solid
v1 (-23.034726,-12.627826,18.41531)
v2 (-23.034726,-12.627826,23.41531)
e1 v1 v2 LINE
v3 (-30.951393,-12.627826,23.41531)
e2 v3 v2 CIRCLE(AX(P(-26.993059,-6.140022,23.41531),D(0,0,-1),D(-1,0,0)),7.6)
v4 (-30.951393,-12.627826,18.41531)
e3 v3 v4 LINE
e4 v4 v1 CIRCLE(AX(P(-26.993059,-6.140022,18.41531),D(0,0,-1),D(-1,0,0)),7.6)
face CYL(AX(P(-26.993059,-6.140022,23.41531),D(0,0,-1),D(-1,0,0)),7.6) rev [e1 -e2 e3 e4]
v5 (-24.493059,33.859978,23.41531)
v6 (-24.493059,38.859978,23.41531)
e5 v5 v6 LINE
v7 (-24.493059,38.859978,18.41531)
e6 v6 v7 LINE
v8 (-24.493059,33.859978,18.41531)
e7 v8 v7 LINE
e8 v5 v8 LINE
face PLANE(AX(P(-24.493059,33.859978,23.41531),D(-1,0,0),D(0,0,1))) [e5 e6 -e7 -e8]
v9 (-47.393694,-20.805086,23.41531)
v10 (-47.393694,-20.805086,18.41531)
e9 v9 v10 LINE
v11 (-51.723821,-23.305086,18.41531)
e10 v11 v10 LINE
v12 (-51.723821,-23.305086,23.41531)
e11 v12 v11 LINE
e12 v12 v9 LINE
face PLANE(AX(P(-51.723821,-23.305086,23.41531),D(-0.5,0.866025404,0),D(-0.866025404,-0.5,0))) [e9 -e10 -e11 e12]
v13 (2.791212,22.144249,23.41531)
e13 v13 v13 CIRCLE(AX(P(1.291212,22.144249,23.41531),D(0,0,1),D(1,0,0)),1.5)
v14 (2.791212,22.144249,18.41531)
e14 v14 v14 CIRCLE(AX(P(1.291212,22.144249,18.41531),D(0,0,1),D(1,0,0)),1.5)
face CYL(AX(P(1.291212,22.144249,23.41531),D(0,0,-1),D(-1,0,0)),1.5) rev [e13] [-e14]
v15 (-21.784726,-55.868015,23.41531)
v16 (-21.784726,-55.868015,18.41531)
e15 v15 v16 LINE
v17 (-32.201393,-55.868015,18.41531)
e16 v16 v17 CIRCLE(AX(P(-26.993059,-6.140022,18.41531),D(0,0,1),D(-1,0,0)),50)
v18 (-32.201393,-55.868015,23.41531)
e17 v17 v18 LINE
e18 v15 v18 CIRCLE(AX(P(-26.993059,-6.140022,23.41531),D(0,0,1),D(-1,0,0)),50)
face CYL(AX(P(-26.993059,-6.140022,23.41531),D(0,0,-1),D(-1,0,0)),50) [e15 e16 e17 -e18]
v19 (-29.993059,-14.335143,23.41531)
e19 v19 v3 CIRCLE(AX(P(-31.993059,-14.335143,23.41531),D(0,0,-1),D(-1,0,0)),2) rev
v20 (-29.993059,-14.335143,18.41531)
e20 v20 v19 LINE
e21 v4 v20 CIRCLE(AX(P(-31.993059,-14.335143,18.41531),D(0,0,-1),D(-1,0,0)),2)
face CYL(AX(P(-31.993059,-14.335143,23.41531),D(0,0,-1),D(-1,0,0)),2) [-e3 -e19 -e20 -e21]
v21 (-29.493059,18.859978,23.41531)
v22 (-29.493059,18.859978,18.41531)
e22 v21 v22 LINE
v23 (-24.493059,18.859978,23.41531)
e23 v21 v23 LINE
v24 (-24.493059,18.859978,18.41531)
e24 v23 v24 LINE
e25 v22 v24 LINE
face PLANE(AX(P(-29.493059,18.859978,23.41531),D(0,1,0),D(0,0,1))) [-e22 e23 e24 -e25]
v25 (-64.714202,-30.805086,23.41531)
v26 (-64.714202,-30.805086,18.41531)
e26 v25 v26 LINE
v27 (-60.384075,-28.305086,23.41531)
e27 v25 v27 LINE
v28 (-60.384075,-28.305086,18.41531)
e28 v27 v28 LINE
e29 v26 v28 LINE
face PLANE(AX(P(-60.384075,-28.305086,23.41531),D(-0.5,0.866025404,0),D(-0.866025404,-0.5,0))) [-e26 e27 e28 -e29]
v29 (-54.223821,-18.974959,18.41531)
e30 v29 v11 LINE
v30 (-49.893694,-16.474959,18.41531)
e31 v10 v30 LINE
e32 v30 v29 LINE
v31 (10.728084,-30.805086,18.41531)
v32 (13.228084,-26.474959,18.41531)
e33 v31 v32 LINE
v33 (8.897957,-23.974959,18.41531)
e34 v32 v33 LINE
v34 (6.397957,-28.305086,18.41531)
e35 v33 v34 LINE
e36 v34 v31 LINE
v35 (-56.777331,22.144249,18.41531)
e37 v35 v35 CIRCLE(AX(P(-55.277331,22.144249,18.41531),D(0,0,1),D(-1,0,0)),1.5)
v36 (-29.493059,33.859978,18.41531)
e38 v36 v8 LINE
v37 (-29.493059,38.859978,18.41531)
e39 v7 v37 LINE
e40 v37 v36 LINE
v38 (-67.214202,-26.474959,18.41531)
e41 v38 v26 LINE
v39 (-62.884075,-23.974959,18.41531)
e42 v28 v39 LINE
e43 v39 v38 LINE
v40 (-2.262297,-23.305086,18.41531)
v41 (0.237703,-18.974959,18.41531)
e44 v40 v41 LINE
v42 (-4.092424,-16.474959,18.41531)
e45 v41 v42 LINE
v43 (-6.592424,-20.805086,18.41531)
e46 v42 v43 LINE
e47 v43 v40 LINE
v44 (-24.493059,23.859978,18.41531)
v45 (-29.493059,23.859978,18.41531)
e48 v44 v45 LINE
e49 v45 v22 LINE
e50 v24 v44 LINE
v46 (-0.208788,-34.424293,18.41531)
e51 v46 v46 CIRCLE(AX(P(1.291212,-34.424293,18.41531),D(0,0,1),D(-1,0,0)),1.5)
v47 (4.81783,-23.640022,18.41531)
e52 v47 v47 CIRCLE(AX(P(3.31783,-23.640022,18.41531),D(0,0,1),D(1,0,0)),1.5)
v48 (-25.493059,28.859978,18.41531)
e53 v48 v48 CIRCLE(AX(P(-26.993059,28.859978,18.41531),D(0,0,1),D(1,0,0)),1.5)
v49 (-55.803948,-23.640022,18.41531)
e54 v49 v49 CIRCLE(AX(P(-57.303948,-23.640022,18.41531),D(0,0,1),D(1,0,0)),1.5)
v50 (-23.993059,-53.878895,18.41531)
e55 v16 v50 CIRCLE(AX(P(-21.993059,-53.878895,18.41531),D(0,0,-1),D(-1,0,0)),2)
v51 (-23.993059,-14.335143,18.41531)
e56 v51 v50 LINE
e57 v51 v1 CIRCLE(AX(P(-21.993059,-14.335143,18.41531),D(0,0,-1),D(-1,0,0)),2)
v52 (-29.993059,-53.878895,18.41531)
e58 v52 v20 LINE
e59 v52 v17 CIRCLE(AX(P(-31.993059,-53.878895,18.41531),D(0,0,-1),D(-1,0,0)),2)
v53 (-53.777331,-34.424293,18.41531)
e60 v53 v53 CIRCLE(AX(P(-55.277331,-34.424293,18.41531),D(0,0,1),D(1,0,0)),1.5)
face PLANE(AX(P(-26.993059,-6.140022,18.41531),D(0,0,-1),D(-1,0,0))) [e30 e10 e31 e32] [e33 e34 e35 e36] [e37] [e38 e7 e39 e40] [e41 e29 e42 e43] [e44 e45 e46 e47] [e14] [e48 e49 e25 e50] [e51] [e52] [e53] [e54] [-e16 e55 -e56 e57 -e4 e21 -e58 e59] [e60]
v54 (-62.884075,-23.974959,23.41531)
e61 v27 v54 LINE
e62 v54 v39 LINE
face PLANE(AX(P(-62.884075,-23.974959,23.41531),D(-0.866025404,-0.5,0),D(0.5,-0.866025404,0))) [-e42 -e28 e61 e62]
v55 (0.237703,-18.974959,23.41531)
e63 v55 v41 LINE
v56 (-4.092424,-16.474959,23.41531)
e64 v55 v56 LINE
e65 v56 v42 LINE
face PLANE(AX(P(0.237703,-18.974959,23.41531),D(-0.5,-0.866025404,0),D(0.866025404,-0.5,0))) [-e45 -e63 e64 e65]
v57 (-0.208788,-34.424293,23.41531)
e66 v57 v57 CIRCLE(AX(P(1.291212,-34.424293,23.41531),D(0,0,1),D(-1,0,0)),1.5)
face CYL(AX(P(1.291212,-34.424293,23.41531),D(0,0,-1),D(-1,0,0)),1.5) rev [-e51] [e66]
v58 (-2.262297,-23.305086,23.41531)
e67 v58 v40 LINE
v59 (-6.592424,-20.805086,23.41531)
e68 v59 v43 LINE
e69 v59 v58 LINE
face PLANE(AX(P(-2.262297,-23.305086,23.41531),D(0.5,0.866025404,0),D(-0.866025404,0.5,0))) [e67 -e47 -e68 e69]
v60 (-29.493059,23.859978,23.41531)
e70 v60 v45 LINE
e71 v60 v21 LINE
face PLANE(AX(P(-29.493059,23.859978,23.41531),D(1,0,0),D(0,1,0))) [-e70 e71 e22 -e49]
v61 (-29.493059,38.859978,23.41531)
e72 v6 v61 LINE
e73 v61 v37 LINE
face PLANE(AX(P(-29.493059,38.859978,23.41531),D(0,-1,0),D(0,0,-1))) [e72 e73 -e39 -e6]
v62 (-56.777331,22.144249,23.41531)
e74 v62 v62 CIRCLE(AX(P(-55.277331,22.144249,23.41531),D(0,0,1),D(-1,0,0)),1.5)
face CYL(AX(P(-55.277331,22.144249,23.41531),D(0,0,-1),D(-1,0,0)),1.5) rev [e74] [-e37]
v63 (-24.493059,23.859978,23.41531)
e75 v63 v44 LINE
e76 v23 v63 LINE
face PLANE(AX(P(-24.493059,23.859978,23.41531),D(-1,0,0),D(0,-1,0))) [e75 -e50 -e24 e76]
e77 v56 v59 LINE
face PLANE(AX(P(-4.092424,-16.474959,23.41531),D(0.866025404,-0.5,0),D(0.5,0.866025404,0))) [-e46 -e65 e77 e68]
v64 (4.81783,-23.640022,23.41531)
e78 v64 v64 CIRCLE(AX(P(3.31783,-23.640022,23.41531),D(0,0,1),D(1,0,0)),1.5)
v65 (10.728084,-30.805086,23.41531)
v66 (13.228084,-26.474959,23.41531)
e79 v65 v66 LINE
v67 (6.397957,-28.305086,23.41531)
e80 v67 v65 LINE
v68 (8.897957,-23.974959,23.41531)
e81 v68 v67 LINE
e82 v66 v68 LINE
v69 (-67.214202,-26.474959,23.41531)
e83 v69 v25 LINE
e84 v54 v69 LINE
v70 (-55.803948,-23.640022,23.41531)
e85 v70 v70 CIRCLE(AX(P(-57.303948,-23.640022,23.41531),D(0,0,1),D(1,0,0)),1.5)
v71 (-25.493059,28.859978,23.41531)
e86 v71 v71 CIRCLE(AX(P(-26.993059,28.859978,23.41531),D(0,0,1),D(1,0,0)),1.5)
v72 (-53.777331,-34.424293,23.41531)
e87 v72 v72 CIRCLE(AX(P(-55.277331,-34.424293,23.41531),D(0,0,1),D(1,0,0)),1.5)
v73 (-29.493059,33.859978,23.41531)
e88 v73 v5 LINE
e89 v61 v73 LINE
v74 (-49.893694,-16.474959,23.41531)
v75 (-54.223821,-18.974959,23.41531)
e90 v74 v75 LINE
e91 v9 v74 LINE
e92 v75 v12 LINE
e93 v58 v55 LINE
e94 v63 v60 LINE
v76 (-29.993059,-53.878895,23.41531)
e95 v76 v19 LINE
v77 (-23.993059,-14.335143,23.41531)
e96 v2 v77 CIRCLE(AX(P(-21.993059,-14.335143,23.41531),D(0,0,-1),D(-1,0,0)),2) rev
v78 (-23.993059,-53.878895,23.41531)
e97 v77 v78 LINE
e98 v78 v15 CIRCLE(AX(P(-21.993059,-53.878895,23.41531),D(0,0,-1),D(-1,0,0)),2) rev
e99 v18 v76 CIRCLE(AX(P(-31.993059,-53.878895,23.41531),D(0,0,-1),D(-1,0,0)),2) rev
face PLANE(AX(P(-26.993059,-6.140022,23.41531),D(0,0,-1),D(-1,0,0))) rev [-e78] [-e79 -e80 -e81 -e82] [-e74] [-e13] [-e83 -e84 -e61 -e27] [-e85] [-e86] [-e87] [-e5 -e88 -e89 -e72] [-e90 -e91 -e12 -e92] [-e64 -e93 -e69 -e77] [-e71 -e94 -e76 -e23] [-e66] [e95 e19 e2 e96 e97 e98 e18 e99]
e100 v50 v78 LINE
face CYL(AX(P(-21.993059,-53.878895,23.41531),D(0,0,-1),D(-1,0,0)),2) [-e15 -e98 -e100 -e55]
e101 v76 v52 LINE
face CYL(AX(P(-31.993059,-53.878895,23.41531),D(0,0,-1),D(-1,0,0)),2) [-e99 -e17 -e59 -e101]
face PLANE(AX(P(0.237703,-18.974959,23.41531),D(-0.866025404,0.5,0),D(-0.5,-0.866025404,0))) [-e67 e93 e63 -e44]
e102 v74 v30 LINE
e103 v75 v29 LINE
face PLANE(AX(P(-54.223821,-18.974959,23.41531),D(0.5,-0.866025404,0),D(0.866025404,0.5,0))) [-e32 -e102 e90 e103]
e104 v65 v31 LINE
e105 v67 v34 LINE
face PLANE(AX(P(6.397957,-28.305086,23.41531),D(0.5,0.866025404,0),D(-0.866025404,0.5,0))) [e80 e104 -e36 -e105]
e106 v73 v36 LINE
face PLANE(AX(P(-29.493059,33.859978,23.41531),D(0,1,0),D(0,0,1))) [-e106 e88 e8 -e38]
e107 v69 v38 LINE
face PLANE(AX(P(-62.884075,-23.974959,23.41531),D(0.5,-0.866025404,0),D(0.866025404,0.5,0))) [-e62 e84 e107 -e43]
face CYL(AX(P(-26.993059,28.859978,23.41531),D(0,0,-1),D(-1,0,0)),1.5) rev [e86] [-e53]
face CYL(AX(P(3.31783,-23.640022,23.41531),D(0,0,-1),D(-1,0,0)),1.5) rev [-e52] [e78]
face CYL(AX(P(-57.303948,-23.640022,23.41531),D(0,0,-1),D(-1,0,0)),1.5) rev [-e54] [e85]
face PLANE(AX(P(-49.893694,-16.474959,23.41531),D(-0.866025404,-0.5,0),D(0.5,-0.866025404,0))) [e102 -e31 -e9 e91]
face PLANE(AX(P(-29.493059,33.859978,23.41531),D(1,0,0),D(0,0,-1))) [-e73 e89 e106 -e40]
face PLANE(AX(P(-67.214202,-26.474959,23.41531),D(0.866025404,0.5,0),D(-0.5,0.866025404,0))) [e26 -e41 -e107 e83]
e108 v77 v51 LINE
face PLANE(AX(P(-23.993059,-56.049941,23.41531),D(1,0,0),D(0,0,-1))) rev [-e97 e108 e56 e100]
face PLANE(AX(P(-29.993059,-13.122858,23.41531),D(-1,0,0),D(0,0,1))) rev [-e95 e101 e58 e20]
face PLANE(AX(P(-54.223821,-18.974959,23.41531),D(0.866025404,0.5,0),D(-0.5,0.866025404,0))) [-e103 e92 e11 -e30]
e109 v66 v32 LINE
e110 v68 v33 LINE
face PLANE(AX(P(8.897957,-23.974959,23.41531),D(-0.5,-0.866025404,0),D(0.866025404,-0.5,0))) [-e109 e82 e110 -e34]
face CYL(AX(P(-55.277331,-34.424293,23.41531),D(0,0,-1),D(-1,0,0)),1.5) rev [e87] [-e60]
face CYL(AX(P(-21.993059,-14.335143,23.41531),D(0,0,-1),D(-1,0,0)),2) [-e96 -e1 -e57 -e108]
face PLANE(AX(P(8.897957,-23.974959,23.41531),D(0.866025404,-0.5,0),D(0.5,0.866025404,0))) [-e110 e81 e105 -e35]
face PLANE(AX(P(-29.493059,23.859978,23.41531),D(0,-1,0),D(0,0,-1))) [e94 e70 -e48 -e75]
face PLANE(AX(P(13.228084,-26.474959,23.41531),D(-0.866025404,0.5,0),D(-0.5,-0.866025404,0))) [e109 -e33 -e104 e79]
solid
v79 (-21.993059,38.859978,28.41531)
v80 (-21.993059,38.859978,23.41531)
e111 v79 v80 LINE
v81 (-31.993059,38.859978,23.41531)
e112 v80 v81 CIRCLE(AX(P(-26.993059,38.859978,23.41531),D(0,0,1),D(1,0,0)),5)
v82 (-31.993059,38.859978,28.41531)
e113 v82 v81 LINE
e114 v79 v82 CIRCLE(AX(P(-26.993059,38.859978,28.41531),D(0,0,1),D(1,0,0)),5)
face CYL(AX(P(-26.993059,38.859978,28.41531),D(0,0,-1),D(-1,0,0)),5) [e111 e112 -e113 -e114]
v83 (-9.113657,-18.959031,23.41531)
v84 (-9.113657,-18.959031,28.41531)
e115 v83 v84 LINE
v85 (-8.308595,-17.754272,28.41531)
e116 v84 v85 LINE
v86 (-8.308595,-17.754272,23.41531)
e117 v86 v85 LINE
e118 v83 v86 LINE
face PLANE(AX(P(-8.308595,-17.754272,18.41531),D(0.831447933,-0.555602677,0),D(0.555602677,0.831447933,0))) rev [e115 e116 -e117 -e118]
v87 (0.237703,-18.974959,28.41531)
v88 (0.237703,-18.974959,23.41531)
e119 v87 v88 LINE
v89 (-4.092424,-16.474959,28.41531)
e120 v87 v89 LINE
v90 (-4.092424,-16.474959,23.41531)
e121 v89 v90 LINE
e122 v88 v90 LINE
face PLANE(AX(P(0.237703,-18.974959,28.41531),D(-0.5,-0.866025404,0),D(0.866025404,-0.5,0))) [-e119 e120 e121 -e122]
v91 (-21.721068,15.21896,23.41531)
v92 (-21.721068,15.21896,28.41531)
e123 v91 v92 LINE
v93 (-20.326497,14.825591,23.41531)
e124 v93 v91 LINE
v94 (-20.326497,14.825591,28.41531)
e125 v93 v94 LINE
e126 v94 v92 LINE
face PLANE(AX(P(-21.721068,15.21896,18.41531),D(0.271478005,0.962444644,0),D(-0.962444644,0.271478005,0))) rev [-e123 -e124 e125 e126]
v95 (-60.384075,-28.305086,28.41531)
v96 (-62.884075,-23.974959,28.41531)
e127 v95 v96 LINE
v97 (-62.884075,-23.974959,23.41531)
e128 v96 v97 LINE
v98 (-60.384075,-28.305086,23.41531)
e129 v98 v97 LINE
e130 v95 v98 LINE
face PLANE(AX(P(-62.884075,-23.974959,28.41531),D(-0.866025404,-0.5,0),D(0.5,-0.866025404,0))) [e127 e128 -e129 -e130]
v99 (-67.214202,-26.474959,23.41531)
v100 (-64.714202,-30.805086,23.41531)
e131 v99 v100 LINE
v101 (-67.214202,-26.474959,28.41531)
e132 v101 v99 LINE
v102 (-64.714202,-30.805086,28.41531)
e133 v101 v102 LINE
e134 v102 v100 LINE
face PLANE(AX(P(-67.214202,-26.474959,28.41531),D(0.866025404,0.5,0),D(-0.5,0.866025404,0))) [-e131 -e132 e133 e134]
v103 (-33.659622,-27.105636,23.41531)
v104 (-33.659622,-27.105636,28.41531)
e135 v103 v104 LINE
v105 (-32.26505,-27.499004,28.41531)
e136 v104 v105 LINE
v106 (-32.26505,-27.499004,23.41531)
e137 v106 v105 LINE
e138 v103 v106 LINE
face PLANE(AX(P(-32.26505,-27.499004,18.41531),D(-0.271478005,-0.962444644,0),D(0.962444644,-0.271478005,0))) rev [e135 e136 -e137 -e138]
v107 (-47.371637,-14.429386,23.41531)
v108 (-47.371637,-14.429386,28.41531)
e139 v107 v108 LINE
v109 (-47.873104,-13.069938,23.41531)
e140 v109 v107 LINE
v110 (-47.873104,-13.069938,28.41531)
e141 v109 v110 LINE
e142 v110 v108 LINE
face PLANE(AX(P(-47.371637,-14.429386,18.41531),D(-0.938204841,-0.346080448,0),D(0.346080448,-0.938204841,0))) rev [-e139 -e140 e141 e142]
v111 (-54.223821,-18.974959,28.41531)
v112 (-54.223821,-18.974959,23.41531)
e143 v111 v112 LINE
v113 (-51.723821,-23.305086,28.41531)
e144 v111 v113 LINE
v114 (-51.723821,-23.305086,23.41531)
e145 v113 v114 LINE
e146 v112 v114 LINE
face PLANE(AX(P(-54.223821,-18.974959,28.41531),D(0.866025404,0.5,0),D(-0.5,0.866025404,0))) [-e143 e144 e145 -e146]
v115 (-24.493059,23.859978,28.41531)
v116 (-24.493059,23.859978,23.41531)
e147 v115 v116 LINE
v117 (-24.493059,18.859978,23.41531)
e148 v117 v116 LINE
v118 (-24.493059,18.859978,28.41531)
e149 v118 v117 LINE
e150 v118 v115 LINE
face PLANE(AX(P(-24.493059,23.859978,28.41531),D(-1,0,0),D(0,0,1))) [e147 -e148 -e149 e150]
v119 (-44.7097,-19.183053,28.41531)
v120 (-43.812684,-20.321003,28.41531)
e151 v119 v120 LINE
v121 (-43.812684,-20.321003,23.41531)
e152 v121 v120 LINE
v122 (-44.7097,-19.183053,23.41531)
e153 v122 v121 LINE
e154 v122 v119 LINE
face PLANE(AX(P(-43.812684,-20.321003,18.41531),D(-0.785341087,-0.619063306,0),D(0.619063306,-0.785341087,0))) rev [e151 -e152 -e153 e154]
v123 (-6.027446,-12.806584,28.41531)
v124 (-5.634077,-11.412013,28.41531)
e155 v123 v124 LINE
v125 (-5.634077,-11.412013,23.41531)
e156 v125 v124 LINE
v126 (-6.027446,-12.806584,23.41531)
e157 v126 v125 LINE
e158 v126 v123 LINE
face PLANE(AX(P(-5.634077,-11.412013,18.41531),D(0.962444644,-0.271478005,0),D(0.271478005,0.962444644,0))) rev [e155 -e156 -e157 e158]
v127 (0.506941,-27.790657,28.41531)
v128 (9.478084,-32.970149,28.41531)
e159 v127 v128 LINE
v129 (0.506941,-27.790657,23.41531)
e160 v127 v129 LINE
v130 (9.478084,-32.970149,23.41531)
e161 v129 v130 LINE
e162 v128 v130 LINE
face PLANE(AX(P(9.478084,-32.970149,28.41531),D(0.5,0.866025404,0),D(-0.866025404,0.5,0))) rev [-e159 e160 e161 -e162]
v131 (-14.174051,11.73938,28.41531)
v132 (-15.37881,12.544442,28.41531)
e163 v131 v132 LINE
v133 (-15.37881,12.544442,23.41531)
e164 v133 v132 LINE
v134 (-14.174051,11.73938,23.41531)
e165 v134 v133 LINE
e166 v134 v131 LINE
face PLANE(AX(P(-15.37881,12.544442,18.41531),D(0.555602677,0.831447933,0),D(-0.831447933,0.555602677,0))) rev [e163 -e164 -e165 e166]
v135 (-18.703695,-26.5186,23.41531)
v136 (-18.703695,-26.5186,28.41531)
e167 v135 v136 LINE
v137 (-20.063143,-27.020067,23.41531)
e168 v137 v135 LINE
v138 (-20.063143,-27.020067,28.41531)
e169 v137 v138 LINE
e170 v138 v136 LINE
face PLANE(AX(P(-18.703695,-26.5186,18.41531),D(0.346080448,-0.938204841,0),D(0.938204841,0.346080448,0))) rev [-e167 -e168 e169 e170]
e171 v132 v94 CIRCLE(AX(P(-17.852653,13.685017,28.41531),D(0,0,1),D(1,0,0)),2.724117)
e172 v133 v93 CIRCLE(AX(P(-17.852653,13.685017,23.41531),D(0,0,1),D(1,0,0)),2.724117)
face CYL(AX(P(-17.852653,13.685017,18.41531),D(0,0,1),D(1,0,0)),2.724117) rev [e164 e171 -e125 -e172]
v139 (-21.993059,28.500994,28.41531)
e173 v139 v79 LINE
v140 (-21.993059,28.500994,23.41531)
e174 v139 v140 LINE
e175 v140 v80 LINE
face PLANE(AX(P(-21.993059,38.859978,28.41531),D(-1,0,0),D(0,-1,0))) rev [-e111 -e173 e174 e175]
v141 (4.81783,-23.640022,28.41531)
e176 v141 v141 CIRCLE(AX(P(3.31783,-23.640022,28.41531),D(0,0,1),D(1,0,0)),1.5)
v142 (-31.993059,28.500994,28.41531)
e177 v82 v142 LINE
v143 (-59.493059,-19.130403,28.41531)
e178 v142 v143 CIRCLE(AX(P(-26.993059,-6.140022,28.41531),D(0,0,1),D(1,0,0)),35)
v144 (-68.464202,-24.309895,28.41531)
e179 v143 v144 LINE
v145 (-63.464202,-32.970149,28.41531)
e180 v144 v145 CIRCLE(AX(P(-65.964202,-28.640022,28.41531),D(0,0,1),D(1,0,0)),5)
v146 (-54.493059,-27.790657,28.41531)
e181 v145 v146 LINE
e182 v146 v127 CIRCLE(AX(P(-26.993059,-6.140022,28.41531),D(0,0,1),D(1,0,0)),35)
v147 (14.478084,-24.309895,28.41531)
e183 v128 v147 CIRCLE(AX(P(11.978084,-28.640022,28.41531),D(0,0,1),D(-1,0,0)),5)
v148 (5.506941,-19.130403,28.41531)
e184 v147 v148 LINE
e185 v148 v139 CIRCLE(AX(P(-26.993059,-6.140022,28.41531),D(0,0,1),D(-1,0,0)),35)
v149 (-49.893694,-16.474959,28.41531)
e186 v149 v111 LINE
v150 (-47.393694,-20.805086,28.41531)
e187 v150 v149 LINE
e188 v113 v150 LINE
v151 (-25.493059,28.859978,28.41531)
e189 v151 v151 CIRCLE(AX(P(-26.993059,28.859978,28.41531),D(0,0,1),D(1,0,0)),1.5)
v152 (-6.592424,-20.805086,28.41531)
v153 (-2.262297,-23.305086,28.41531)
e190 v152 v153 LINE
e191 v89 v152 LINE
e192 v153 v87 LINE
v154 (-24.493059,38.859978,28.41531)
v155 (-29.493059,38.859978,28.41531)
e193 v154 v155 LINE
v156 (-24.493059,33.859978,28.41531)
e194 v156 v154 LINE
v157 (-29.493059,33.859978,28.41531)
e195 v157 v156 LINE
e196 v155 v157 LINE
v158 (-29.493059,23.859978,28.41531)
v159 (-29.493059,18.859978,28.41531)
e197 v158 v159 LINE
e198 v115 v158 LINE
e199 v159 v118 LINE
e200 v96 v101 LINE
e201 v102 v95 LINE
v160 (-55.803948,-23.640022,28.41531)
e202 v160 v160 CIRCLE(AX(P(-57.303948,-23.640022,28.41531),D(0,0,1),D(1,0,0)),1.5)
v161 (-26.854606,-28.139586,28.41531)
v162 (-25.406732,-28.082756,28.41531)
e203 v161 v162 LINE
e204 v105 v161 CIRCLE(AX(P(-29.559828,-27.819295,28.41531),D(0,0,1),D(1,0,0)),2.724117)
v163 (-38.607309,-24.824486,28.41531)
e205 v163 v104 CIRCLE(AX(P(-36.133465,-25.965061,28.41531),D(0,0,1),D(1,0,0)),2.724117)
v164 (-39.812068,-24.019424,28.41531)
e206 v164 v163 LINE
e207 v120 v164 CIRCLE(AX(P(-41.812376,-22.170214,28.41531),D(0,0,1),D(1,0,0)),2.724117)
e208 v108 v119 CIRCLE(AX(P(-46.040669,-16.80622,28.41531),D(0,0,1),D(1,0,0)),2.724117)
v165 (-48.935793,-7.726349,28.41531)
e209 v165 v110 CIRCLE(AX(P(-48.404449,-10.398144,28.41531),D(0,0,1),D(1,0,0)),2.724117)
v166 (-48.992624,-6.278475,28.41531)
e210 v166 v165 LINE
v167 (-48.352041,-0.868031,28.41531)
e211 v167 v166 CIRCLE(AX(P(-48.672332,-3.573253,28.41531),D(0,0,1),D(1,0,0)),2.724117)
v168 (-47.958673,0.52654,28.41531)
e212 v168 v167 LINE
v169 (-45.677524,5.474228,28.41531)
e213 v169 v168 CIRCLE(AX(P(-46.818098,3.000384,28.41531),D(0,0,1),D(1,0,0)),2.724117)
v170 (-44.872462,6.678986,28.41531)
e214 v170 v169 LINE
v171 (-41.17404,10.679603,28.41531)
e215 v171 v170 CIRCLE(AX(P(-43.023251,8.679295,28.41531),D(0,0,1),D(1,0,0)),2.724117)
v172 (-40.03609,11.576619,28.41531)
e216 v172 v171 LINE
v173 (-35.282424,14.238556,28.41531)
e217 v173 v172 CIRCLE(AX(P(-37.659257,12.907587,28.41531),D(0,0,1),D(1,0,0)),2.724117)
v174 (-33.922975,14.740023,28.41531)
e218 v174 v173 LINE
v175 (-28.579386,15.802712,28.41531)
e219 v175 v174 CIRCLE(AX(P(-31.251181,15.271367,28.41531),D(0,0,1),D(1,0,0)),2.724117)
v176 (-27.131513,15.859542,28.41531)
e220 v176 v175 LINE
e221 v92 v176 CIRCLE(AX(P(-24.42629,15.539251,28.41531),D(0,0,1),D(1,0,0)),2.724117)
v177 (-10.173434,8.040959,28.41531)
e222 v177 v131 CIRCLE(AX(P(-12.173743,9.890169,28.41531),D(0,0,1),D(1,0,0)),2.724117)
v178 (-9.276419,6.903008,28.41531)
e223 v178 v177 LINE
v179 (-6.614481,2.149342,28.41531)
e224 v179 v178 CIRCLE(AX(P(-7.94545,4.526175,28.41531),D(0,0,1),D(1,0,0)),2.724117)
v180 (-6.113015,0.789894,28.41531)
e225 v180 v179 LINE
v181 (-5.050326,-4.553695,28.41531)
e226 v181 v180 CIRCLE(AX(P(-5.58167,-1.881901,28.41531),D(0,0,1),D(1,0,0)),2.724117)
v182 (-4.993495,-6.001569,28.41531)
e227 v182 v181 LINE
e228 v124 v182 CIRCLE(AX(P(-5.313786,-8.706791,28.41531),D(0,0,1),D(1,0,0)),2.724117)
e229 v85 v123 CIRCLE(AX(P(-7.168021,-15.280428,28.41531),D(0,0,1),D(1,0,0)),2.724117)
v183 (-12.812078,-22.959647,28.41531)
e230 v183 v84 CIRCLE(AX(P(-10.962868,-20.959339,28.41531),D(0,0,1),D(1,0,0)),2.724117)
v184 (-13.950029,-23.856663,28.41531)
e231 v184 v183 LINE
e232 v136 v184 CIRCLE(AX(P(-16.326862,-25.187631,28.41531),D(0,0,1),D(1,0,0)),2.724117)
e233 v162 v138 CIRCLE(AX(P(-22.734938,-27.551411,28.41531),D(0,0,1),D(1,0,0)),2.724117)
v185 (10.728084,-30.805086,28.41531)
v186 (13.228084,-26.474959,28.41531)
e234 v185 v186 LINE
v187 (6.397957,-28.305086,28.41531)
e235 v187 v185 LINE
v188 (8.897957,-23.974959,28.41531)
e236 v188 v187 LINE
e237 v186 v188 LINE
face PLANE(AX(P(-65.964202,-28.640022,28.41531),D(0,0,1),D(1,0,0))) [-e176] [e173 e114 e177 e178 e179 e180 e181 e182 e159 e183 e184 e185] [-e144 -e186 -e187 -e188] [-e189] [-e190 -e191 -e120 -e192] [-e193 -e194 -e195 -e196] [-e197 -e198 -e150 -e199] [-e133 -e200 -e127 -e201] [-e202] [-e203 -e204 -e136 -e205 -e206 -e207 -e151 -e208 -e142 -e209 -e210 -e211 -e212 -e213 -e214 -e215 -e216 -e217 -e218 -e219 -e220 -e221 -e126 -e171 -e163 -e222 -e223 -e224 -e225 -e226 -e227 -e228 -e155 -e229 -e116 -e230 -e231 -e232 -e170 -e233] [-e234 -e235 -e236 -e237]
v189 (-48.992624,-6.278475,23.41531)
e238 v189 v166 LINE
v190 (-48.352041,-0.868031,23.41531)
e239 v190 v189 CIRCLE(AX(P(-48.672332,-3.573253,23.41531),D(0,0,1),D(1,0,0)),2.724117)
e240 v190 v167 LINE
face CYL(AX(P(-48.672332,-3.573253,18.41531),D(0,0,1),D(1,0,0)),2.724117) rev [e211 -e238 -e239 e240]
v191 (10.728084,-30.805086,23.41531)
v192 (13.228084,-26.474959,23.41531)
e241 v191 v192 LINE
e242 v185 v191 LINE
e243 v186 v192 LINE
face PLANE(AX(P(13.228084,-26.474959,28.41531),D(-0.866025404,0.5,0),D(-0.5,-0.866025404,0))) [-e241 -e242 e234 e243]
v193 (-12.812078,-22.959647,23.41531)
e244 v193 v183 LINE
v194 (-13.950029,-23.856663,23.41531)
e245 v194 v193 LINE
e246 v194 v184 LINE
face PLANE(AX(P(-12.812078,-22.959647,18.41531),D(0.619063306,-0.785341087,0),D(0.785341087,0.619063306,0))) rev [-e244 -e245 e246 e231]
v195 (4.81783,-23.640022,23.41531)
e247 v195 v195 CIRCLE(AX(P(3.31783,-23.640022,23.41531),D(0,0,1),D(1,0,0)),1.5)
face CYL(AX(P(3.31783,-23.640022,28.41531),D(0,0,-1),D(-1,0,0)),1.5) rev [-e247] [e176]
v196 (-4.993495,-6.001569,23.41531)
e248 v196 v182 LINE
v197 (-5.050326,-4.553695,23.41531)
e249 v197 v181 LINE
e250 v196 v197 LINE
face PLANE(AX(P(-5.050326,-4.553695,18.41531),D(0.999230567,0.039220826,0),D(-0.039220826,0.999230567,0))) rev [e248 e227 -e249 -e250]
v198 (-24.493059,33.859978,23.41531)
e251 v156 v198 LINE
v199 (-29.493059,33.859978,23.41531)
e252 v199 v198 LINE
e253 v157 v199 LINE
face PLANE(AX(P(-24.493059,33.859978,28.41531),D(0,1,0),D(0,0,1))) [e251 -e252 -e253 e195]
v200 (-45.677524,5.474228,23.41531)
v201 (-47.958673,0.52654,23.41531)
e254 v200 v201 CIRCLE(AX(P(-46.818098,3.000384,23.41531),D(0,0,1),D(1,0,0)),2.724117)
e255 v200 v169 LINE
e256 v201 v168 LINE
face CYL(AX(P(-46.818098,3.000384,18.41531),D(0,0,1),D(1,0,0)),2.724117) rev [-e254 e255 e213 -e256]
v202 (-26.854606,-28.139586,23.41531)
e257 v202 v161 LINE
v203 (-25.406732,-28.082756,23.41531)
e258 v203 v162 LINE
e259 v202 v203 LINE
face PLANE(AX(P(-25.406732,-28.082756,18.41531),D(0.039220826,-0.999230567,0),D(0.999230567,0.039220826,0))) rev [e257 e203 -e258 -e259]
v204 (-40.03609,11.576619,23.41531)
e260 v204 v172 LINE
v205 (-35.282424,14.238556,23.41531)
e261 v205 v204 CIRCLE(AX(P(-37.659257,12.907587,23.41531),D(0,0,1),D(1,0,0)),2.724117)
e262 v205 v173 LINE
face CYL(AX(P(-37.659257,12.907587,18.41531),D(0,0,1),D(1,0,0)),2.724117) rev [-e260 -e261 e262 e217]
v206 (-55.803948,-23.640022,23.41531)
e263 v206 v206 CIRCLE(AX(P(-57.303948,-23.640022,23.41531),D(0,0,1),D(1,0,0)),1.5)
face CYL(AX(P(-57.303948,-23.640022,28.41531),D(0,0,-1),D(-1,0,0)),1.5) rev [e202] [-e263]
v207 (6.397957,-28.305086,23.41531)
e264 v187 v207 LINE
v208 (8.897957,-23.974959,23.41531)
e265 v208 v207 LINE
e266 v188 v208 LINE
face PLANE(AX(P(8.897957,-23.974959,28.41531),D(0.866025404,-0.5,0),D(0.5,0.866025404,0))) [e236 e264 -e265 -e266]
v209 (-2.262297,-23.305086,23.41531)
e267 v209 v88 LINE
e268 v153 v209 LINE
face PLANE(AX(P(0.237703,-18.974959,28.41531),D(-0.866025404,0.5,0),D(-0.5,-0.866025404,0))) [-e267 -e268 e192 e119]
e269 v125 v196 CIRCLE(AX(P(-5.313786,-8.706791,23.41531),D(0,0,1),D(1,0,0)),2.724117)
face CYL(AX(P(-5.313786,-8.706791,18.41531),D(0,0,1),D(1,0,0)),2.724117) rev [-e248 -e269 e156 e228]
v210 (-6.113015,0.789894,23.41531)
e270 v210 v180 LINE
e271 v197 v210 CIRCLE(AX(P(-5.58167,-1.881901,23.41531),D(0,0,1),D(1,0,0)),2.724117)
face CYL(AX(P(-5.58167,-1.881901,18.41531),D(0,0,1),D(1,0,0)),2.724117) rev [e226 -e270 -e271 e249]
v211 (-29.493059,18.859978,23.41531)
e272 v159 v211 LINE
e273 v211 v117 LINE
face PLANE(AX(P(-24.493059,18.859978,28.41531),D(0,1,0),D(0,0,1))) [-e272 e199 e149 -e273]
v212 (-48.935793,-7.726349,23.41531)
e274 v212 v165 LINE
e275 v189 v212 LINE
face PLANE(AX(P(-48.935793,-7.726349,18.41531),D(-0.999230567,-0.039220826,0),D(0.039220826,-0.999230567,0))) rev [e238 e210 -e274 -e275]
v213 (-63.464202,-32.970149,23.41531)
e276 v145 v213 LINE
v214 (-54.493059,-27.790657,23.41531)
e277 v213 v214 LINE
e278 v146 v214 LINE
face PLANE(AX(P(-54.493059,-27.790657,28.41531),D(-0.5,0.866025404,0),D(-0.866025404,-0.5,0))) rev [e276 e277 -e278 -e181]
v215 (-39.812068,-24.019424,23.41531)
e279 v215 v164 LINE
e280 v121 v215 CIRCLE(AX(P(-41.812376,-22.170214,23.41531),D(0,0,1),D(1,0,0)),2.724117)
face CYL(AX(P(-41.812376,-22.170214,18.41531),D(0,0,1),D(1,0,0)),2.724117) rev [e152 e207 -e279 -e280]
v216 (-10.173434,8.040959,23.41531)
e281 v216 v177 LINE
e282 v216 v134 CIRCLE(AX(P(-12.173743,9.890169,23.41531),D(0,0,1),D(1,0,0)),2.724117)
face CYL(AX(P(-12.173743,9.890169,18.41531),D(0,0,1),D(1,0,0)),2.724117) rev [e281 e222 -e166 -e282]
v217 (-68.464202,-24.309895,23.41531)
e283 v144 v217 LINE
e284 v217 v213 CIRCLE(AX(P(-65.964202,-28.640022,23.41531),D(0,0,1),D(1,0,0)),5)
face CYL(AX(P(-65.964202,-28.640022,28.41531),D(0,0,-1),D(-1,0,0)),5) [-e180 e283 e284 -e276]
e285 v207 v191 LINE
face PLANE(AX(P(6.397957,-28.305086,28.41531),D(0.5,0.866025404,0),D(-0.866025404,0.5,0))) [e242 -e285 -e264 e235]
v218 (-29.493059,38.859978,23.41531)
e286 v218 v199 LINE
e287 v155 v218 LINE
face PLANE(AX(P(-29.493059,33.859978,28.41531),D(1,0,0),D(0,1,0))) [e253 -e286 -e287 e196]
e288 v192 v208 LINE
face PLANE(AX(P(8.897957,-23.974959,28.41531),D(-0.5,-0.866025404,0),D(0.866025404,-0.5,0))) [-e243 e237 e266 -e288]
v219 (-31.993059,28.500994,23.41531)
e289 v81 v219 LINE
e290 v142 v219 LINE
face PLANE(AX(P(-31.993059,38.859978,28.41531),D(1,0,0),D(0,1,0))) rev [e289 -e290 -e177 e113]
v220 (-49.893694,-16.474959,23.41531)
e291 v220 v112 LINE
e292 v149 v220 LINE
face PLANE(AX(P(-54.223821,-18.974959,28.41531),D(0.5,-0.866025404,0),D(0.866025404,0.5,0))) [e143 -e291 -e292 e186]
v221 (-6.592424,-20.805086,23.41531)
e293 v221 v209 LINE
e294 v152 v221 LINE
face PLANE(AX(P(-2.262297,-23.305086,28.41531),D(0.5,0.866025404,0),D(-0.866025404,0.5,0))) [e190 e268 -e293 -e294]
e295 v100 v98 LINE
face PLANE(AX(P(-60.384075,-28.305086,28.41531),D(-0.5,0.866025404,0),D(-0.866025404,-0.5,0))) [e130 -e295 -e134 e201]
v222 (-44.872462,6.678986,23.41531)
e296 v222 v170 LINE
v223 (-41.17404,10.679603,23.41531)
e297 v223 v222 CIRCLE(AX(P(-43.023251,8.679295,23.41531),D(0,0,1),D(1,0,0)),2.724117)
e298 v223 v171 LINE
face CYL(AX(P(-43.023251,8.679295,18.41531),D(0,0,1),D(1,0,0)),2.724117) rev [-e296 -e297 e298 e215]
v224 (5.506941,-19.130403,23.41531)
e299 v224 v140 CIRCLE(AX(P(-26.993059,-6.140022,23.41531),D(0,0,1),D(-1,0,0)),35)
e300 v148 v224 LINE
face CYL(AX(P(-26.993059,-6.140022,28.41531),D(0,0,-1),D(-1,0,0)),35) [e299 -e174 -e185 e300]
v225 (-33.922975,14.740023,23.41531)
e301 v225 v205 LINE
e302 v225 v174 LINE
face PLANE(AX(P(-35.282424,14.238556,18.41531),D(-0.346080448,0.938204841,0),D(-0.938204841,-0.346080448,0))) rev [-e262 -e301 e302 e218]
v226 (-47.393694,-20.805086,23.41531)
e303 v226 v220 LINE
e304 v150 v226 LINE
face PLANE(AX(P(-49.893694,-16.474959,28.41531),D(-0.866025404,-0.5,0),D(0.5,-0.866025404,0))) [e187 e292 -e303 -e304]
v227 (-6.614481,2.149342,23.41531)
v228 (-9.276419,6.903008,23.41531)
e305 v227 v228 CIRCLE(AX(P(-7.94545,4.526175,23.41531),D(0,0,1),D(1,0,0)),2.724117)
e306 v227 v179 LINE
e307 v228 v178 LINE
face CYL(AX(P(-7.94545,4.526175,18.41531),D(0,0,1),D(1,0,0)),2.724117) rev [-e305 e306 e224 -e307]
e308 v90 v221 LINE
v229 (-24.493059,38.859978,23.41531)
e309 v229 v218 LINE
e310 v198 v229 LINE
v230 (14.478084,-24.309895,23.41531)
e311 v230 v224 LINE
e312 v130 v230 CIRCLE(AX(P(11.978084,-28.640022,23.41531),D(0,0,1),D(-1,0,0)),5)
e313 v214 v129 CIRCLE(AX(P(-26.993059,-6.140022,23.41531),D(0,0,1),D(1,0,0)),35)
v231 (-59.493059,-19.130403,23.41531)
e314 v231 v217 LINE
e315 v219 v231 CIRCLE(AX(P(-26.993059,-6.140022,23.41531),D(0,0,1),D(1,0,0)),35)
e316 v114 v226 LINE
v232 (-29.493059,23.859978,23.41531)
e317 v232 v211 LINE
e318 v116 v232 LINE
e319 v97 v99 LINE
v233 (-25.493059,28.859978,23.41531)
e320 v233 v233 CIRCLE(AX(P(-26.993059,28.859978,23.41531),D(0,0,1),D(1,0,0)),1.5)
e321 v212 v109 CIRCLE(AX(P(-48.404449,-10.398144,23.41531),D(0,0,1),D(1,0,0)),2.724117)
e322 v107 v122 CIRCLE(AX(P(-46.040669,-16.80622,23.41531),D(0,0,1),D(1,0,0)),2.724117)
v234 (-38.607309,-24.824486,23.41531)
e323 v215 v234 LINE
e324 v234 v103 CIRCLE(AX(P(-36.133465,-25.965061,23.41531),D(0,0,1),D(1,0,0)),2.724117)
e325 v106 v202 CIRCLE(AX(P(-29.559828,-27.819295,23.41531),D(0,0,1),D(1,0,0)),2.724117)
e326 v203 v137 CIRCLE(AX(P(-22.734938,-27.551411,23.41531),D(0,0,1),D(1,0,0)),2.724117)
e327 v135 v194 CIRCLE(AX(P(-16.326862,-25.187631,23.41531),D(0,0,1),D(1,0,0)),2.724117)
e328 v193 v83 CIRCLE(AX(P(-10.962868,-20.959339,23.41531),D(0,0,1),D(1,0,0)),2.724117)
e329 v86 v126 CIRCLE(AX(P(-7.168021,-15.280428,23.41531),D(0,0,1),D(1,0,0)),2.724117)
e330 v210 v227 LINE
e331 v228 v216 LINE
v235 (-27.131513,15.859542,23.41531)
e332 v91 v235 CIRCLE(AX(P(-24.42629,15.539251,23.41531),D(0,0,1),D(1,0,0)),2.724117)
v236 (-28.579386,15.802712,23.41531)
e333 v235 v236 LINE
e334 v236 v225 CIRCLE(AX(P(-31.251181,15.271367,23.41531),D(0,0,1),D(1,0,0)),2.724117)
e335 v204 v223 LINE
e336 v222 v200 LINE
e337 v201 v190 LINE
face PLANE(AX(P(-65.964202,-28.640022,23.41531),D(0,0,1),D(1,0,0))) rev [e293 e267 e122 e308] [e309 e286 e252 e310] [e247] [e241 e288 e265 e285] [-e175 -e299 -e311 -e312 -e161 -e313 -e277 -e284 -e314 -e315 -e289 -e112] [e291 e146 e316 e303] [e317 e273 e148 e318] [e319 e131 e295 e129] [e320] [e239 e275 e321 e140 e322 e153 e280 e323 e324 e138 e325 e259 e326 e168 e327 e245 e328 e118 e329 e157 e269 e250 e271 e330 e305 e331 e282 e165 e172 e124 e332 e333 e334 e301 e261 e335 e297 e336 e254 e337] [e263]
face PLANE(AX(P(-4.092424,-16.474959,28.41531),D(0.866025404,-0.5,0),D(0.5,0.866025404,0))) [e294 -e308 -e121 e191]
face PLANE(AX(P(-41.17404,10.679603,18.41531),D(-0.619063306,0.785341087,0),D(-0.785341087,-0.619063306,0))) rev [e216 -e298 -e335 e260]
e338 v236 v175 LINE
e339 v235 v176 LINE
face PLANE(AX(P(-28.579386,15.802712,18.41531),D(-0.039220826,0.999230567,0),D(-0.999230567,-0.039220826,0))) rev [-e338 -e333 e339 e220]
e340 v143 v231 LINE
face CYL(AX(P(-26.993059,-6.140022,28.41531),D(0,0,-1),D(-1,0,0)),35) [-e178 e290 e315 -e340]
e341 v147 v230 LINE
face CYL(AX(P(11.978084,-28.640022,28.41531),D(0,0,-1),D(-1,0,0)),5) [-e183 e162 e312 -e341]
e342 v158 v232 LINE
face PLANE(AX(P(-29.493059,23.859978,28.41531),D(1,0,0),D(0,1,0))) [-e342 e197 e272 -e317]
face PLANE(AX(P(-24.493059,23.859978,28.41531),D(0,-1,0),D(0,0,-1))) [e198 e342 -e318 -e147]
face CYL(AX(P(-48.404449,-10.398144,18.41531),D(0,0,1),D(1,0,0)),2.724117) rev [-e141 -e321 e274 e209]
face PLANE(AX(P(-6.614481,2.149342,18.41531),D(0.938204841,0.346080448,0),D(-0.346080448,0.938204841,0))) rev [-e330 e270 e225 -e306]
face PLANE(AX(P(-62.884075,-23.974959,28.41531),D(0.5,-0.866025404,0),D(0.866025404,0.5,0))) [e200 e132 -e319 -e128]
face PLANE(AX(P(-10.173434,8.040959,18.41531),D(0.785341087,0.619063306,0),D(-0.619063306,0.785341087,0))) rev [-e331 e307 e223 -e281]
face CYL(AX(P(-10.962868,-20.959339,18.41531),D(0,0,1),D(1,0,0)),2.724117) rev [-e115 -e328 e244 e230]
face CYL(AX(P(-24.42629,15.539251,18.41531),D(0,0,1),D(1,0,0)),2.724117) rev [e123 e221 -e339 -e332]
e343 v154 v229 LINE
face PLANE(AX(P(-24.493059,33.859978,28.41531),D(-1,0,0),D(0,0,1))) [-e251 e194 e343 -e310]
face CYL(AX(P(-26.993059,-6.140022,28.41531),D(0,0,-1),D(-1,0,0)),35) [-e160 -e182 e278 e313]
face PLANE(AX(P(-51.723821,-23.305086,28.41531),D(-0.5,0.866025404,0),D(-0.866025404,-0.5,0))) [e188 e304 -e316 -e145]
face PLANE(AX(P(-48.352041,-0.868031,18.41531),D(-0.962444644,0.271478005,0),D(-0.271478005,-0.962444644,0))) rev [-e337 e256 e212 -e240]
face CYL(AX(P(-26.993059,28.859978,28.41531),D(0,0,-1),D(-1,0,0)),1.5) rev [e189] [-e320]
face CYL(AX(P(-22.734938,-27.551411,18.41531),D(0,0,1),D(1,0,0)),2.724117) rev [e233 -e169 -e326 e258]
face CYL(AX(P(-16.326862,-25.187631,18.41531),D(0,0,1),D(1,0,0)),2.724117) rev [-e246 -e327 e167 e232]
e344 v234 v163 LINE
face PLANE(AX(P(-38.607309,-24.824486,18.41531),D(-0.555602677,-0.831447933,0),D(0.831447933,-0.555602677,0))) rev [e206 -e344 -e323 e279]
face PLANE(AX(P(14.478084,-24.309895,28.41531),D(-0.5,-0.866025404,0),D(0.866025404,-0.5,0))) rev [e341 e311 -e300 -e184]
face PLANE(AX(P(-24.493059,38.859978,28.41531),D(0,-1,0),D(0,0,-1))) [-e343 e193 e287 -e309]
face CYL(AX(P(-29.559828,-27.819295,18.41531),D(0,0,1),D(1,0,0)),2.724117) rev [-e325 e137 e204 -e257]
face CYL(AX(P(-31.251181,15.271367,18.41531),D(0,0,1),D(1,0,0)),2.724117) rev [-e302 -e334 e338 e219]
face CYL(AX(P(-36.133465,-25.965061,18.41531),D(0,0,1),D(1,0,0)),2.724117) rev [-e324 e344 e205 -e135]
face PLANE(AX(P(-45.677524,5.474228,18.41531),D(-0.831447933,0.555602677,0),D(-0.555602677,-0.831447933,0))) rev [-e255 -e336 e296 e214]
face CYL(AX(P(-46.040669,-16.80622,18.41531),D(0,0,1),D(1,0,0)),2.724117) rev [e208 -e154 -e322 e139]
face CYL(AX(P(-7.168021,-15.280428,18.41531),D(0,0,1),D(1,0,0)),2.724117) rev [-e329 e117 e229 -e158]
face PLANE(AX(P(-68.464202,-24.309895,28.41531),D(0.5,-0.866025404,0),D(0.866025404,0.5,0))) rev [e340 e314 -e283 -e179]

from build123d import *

# Parameters (mm, degrees)
BODY_MOVE_COPY2_START     = 18.4153099
BODY_MOVE_COPY2_OUTLINE_R = 1.5
BODY_MOVE_COPY2_OUTLINE_W = 5
BODY_MOVE_COPY2_OUTLINE_H = 5
BODY_MOVE_COPY2_DEPTH     = 5
SKETCH2_R                 = 1.5
SKETCH2_W                 = 5
SKETCH2_H                 = 5
BOSS_EXTRUDE1_DEPTH       = 5
CUT_EXTRUDE1_DEPTH        = 10


# Read off the part's stored shape, not the designer's step: Body-Move/Copy2
with BuildPart() as part:
    # Body-Move/Copy2 outline → Body-Move/Copy2 (new body)
    with BuildSketch(Plane.XY.offset(BODY_MOVE_COPY2_START)):
        with BuildLine():
            ThreePointArc((-29.993059319, -14.335142591), (-30.249021858, -13.35619758), (-30.951392653, -12.62782582))
            ThreePointArc((-30.951392653, -12.62782582), (-26.993059319, 1.459977909), (-23.034725986, -12.62782582))
            ThreePointArc((-23.034725986, -12.62782582), (-23.737096781, -13.35619758), (-23.993059319, -14.335142591))
            Line((-23.993059319, -14.335142591), (-23.993059319, -53.87889514))
            ThreePointArc((-23.993059319, -53.87889514), (-23.331590853, -55.364941349), (-21.784725986, -55.868014851))
            ThreePointArc((-21.784725986, -55.868014851), (-26.993059319, 43.859977909), (-32.201392653, -55.868014851))
            ThreePointArc((-32.201392653, -55.868014851), (-30.654527786, -55.364941349), (-29.993059319, -53.87889514))
            Line((-29.993059319, -53.87889514), (-29.993059319, -14.335142591))
        make_face()
        with Locations((-55.277330567, -34.424293339)):
            Circle(BODY_MOVE_COPY2_OUTLINE_R, mode=Mode.SUBTRACT)
        Polygon((-67.21420249, -26.474958582), (-62.884075471, -23.974958582), (-60.384075471, -28.305085601), (-64.71420249, -30.805085601), align=None, mode=Mode.SUBTRACT)
        with Locations((-57.303948452, -23.640022091)):
            Circle(BODY_MOVE_COPY2_OUTLINE_R, mode=Mode.SUBTRACT)
        Polygon((-47.393694414, -20.805085601), (-51.723821433, -23.305085601), (-54.223821433, -18.974958582), (-49.893694414, -16.474958582), align=None, mode=Mode.SUBTRACT)
        with Locations((1.291211928, -34.424293339)):
            Circle(BODY_MOVE_COPY2_OUTLINE_R, mode=Mode.SUBTRACT)
        Polygon((-4.092424225, -16.474958582), (0.237702794, -18.974958582), (-2.262297206, -23.305085601), (-6.592424225, -20.805085601), align=None, mode=Mode.SUBTRACT)
        Polygon((10.728083851, -30.805085601), (6.397956832, -28.305085601), (8.897956832, -23.974958582), (13.228083851, -26.474958582), align=None, mode=Mode.SUBTRACT)
        with Locations((3.317829813, -23.640022091)):
            Circle(BODY_MOVE_COPY2_OUTLINE_R, mode=Mode.SUBTRACT)
        with Locations((-55.277330567, 22.144249156)):
            Circle(BODY_MOVE_COPY2_OUTLINE_R, mode=Mode.SUBTRACT)
        with Locations((-26.993059319, 21.359977909)):
            Rectangle(BODY_MOVE_COPY2_OUTLINE_W, BODY_MOVE_COPY2_OUTLINE_H, mode=Mode.SUBTRACT)
        with Locations((-26.993059319, 28.859977909)):
            Circle(BODY_MOVE_COPY2_OUTLINE_R, mode=Mode.SUBTRACT)
        with Locations((-26.993059319, 36.359977909)):
            Rectangle(BODY_MOVE_COPY2_OUTLINE_W, BODY_MOVE_COPY2_OUTLINE_H, mode=Mode.SUBTRACT)
        with Locations((1.291211928, 22.144249156)):
            Circle(BODY_MOVE_COPY2_OUTLINE_R, mode=Mode.SUBTRACT)
    extrude(amount=BODY_MOVE_COPY2_DEPTH)


with BuildPart() as body_2:
    # Sketch2 → Boss-Extrude1 (new body)
    with BuildSketch(Plane.XY.offset(23.4153099)):
        with BuildLine():
            Line((-68.46420249, -24.309895072), (-59.493059319, -19.130403148))
            ThreePointArc((-59.493059319, -19.130403148), (-57.303948452, 11.359977909), (-31.993059319, 28.50099406))
            Line((-31.993059319, 28.50099406), (-31.993059319, 38.859977909))
            ThreePointArc((-31.993059319, 38.859977909), (-26.993059319, 43.859977909), (-21.993059319, 38.859977909))
            Line((-21.993059319, 38.859977909), (-21.993059319, 28.50099406))
            ThreePointArc((-21.993059319, 28.50099406), (3.317829813, 11.359977909), (5.506940681, -19.130403148))
            Line((5.506940681, -19.130403148), (14.478083851, -24.309895072))
            ThreePointArc((14.478083851, -24.309895072), (16.30821087, -31.140022091), (9.478083851, -32.97014911))
            Line((9.478083851, -32.97014911), (0.506940681, -27.790657186))
            ThreePointArc((0.506940681, -27.790657186), (-26.993059319, -41.140022091), (-54.493059319, -27.790657186))
            Line((-54.493059319, -27.790657186), (-63.46420249, -32.97014911))
            ThreePointArc((-63.46420249, -32.97014911), (-70.294329509, -31.140022091), (-68.46420249, -24.309895072))
        make_face()
        with Locations((-26.993059319, 28.859977909)):
            Circle(SKETCH2_R, mode=Mode.SUBTRACT)
        with Locations((3.317829813, -23.640022091)):
            Circle(SKETCH2_R, mode=Mode.SUBTRACT)
        with Locations((-57.303948452, -23.640022091)):
            Circle(SKETCH2_R, mode=Mode.SUBTRACT)
        with Locations((-26.993059319, 36.359977909)):
            Rectangle(SKETCH2_W, SKETCH2_H, mode=Mode.SUBTRACT)
        with Locations((-26.993059319, 21.359977909)):
            Rectangle(SKETCH2_W, SKETCH2_H, mode=Mode.SUBTRACT)
        Polygon((0.237702794, -18.974958582), (-4.092424225, -16.474958582), (-6.592424225, -20.805085601), (-2.262297206, -23.305085601), align=None, mode=Mode.SUBTRACT)
        Polygon((8.897956832, -23.974958582), (13.228083851, -26.474958582), (10.728083851, -30.805085601), (6.397956832, -28.305085601), align=None, mode=Mode.SUBTRACT)
        Polygon((-62.884075471, -23.974958582), (-67.21420249, -26.474958582), (-64.71420249, -30.805085601), (-60.384075471, -28.305085601), align=None, mode=Mode.SUBTRACT)
        Polygon((-54.223821433, -18.974958582), (-49.893694414, -16.474958582), (-47.393694414, -20.805085601), (-51.723821433, -23.305085601), align=None, mode=Mode.SUBTRACT)
    extrude(amount=BOSS_EXTRUDE1_DEPTH)

    # Sketch3 → Cut-Extrude1 (cut)
    with BuildSketch(Plane.XY.offset(28.4153099)):
        with BuildLine():
            Line((-45.677523519, 5.474227673), (-44.872461508, 6.678986349))
            ThreePointArc((-44.872461508, 6.678986349), (-45.023559076, 10.528505229), (-41.174040195, 10.679602797))
            Line((-41.174040195, 10.679602797), (-40.036089819, 11.576618544))
            ThreePointArc((-40.036089819, 11.576618544), (-38.990225392, 15.284420276), (-35.282423659, 14.238555848))
            Line((-35.282423659, 14.238555848), (-33.922975429, 14.740022514))
            ThreePointArc((-33.922975429, 14.740022514), (-31.782525503, 17.943161631), (-28.579386386, 15.802711705))
            Line((-28.579386386, 15.802711705), (-27.131512567, 15.859542239))
            ThreePointArc((-27.131512567, 15.859542239), (-24.105999294, 18.244473165), (-21.721068368, 15.218959893))
            Line((-21.721068368, 15.218959893), (-20.326496936, 14.825591327))
            ThreePointArc((-20.326496936, 14.825591327), (-16.712078636, 16.158860408), (-15.378809555, 12.544442108))
            Line((-15.378809555, 12.544442108), (-14.174050879, 11.739380097))
            ThreePointArc((-14.174050879, 11.739380097), (-10.324531999, 11.890477665), (-10.173434431, 8.040958785))
            Line((-10.173434431, 8.040958785), (-9.276418685, 6.903008409))
            ThreePointArc((-9.276418685, 6.903008409), (-5.568616952, 5.857143981), (-6.61448138, 2.149342249))
            Line((-6.61448138, 2.149342249), (-6.113014714, 0.789894019))
            ThreePointArc((-6.113014714, 0.789894019), (-2.909875598, -1.350555907), (-5.050325523, -4.553695024))
            Line((-5.050325523, -4.553695024), (-4.99349499, -6.001568844))
            ThreePointArc((-4.99349499, -6.001568844), (-2.608564063, -9.027082116), (-5.634077335, -11.412013043))
            Line((-5.634077335, -11.412013043), (-6.027445902, -12.806584475))
            ThreePointArc((-6.027445902, -12.806584475), (-4.694176821, -16.421002774), (-8.30859512, -17.754271855))
            Line((-8.30859512, -17.754271855), (-9.113657131, -18.959030531))
            ThreePointArc((-9.113657131, -18.959030531), (-8.962559563, -22.808549412), (-12.812078443, -22.95964698))
            Line((-12.812078443, -22.95964698), (-13.95002882, -23.856662726))
            ThreePointArc((-13.95002882, -23.856662726), (-14.995893247, -27.564464458), (-18.703694979, -26.518600031))
            Line((-18.703694979, -26.518600031), (-20.06314321, -27.020066696))
            ThreePointArc((-20.06314321, -27.020066696), (-22.203593136, -30.223205813), (-25.406732252, -28.082755887))
            Line((-25.406732252, -28.082755887), (-26.854606072, -28.139586421))
            ThreePointArc((-26.854606072, -28.139586421), (-29.880119344, -30.524517348), (-32.265050271, -27.499004075))
            Line((-32.265050271, -27.499004075), (-33.659621703, -27.105635509))
            ThreePointArc((-33.659621703, -27.105635509), (-37.274040003, -28.43890459), (-38.607309084, -24.82448629))
            Line((-38.607309084, -24.82448629), (-39.812067759, -24.01942428))
            ThreePointArc((-39.812067759, -24.01942428), (-43.66158664, -24.170521848), (-43.812684208, -20.321002967))
            Line((-43.812684208, -20.321002967), (-44.709699954, -19.183052591))
            ThreePointArc((-44.709699954, -19.183052591), (-48.417501686, -18.137188164), (-47.371637259, -14.429386431))
            Line((-47.371637259, -14.429386431), (-47.873103924, -13.069938201))
            ThreePointArc((-47.873103924, -13.069938201), (-51.076243041, -10.929488275), (-48.935793115, -7.726349158))
            Line((-48.935793115, -7.726349158), (-48.992623649, -6.278475338))
            ThreePointArc((-48.992623649, -6.278475338), (-51.377554576, -3.252962066), (-48.352041304, -0.868031139))
            Line((-48.352041304, -0.868031139), (-47.958672737, 0.526540293))
            ThreePointArc((-47.958672737, 0.526540293), (-49.291941818, 4.140958592), (-45.677523519, 5.474227673))
        make_face()
    extrude(amount=-CUT_EXTRUDE1_DEPTH, mode=Mode.SUBTRACT)


solid = Compound([part.part, body_2.part])
